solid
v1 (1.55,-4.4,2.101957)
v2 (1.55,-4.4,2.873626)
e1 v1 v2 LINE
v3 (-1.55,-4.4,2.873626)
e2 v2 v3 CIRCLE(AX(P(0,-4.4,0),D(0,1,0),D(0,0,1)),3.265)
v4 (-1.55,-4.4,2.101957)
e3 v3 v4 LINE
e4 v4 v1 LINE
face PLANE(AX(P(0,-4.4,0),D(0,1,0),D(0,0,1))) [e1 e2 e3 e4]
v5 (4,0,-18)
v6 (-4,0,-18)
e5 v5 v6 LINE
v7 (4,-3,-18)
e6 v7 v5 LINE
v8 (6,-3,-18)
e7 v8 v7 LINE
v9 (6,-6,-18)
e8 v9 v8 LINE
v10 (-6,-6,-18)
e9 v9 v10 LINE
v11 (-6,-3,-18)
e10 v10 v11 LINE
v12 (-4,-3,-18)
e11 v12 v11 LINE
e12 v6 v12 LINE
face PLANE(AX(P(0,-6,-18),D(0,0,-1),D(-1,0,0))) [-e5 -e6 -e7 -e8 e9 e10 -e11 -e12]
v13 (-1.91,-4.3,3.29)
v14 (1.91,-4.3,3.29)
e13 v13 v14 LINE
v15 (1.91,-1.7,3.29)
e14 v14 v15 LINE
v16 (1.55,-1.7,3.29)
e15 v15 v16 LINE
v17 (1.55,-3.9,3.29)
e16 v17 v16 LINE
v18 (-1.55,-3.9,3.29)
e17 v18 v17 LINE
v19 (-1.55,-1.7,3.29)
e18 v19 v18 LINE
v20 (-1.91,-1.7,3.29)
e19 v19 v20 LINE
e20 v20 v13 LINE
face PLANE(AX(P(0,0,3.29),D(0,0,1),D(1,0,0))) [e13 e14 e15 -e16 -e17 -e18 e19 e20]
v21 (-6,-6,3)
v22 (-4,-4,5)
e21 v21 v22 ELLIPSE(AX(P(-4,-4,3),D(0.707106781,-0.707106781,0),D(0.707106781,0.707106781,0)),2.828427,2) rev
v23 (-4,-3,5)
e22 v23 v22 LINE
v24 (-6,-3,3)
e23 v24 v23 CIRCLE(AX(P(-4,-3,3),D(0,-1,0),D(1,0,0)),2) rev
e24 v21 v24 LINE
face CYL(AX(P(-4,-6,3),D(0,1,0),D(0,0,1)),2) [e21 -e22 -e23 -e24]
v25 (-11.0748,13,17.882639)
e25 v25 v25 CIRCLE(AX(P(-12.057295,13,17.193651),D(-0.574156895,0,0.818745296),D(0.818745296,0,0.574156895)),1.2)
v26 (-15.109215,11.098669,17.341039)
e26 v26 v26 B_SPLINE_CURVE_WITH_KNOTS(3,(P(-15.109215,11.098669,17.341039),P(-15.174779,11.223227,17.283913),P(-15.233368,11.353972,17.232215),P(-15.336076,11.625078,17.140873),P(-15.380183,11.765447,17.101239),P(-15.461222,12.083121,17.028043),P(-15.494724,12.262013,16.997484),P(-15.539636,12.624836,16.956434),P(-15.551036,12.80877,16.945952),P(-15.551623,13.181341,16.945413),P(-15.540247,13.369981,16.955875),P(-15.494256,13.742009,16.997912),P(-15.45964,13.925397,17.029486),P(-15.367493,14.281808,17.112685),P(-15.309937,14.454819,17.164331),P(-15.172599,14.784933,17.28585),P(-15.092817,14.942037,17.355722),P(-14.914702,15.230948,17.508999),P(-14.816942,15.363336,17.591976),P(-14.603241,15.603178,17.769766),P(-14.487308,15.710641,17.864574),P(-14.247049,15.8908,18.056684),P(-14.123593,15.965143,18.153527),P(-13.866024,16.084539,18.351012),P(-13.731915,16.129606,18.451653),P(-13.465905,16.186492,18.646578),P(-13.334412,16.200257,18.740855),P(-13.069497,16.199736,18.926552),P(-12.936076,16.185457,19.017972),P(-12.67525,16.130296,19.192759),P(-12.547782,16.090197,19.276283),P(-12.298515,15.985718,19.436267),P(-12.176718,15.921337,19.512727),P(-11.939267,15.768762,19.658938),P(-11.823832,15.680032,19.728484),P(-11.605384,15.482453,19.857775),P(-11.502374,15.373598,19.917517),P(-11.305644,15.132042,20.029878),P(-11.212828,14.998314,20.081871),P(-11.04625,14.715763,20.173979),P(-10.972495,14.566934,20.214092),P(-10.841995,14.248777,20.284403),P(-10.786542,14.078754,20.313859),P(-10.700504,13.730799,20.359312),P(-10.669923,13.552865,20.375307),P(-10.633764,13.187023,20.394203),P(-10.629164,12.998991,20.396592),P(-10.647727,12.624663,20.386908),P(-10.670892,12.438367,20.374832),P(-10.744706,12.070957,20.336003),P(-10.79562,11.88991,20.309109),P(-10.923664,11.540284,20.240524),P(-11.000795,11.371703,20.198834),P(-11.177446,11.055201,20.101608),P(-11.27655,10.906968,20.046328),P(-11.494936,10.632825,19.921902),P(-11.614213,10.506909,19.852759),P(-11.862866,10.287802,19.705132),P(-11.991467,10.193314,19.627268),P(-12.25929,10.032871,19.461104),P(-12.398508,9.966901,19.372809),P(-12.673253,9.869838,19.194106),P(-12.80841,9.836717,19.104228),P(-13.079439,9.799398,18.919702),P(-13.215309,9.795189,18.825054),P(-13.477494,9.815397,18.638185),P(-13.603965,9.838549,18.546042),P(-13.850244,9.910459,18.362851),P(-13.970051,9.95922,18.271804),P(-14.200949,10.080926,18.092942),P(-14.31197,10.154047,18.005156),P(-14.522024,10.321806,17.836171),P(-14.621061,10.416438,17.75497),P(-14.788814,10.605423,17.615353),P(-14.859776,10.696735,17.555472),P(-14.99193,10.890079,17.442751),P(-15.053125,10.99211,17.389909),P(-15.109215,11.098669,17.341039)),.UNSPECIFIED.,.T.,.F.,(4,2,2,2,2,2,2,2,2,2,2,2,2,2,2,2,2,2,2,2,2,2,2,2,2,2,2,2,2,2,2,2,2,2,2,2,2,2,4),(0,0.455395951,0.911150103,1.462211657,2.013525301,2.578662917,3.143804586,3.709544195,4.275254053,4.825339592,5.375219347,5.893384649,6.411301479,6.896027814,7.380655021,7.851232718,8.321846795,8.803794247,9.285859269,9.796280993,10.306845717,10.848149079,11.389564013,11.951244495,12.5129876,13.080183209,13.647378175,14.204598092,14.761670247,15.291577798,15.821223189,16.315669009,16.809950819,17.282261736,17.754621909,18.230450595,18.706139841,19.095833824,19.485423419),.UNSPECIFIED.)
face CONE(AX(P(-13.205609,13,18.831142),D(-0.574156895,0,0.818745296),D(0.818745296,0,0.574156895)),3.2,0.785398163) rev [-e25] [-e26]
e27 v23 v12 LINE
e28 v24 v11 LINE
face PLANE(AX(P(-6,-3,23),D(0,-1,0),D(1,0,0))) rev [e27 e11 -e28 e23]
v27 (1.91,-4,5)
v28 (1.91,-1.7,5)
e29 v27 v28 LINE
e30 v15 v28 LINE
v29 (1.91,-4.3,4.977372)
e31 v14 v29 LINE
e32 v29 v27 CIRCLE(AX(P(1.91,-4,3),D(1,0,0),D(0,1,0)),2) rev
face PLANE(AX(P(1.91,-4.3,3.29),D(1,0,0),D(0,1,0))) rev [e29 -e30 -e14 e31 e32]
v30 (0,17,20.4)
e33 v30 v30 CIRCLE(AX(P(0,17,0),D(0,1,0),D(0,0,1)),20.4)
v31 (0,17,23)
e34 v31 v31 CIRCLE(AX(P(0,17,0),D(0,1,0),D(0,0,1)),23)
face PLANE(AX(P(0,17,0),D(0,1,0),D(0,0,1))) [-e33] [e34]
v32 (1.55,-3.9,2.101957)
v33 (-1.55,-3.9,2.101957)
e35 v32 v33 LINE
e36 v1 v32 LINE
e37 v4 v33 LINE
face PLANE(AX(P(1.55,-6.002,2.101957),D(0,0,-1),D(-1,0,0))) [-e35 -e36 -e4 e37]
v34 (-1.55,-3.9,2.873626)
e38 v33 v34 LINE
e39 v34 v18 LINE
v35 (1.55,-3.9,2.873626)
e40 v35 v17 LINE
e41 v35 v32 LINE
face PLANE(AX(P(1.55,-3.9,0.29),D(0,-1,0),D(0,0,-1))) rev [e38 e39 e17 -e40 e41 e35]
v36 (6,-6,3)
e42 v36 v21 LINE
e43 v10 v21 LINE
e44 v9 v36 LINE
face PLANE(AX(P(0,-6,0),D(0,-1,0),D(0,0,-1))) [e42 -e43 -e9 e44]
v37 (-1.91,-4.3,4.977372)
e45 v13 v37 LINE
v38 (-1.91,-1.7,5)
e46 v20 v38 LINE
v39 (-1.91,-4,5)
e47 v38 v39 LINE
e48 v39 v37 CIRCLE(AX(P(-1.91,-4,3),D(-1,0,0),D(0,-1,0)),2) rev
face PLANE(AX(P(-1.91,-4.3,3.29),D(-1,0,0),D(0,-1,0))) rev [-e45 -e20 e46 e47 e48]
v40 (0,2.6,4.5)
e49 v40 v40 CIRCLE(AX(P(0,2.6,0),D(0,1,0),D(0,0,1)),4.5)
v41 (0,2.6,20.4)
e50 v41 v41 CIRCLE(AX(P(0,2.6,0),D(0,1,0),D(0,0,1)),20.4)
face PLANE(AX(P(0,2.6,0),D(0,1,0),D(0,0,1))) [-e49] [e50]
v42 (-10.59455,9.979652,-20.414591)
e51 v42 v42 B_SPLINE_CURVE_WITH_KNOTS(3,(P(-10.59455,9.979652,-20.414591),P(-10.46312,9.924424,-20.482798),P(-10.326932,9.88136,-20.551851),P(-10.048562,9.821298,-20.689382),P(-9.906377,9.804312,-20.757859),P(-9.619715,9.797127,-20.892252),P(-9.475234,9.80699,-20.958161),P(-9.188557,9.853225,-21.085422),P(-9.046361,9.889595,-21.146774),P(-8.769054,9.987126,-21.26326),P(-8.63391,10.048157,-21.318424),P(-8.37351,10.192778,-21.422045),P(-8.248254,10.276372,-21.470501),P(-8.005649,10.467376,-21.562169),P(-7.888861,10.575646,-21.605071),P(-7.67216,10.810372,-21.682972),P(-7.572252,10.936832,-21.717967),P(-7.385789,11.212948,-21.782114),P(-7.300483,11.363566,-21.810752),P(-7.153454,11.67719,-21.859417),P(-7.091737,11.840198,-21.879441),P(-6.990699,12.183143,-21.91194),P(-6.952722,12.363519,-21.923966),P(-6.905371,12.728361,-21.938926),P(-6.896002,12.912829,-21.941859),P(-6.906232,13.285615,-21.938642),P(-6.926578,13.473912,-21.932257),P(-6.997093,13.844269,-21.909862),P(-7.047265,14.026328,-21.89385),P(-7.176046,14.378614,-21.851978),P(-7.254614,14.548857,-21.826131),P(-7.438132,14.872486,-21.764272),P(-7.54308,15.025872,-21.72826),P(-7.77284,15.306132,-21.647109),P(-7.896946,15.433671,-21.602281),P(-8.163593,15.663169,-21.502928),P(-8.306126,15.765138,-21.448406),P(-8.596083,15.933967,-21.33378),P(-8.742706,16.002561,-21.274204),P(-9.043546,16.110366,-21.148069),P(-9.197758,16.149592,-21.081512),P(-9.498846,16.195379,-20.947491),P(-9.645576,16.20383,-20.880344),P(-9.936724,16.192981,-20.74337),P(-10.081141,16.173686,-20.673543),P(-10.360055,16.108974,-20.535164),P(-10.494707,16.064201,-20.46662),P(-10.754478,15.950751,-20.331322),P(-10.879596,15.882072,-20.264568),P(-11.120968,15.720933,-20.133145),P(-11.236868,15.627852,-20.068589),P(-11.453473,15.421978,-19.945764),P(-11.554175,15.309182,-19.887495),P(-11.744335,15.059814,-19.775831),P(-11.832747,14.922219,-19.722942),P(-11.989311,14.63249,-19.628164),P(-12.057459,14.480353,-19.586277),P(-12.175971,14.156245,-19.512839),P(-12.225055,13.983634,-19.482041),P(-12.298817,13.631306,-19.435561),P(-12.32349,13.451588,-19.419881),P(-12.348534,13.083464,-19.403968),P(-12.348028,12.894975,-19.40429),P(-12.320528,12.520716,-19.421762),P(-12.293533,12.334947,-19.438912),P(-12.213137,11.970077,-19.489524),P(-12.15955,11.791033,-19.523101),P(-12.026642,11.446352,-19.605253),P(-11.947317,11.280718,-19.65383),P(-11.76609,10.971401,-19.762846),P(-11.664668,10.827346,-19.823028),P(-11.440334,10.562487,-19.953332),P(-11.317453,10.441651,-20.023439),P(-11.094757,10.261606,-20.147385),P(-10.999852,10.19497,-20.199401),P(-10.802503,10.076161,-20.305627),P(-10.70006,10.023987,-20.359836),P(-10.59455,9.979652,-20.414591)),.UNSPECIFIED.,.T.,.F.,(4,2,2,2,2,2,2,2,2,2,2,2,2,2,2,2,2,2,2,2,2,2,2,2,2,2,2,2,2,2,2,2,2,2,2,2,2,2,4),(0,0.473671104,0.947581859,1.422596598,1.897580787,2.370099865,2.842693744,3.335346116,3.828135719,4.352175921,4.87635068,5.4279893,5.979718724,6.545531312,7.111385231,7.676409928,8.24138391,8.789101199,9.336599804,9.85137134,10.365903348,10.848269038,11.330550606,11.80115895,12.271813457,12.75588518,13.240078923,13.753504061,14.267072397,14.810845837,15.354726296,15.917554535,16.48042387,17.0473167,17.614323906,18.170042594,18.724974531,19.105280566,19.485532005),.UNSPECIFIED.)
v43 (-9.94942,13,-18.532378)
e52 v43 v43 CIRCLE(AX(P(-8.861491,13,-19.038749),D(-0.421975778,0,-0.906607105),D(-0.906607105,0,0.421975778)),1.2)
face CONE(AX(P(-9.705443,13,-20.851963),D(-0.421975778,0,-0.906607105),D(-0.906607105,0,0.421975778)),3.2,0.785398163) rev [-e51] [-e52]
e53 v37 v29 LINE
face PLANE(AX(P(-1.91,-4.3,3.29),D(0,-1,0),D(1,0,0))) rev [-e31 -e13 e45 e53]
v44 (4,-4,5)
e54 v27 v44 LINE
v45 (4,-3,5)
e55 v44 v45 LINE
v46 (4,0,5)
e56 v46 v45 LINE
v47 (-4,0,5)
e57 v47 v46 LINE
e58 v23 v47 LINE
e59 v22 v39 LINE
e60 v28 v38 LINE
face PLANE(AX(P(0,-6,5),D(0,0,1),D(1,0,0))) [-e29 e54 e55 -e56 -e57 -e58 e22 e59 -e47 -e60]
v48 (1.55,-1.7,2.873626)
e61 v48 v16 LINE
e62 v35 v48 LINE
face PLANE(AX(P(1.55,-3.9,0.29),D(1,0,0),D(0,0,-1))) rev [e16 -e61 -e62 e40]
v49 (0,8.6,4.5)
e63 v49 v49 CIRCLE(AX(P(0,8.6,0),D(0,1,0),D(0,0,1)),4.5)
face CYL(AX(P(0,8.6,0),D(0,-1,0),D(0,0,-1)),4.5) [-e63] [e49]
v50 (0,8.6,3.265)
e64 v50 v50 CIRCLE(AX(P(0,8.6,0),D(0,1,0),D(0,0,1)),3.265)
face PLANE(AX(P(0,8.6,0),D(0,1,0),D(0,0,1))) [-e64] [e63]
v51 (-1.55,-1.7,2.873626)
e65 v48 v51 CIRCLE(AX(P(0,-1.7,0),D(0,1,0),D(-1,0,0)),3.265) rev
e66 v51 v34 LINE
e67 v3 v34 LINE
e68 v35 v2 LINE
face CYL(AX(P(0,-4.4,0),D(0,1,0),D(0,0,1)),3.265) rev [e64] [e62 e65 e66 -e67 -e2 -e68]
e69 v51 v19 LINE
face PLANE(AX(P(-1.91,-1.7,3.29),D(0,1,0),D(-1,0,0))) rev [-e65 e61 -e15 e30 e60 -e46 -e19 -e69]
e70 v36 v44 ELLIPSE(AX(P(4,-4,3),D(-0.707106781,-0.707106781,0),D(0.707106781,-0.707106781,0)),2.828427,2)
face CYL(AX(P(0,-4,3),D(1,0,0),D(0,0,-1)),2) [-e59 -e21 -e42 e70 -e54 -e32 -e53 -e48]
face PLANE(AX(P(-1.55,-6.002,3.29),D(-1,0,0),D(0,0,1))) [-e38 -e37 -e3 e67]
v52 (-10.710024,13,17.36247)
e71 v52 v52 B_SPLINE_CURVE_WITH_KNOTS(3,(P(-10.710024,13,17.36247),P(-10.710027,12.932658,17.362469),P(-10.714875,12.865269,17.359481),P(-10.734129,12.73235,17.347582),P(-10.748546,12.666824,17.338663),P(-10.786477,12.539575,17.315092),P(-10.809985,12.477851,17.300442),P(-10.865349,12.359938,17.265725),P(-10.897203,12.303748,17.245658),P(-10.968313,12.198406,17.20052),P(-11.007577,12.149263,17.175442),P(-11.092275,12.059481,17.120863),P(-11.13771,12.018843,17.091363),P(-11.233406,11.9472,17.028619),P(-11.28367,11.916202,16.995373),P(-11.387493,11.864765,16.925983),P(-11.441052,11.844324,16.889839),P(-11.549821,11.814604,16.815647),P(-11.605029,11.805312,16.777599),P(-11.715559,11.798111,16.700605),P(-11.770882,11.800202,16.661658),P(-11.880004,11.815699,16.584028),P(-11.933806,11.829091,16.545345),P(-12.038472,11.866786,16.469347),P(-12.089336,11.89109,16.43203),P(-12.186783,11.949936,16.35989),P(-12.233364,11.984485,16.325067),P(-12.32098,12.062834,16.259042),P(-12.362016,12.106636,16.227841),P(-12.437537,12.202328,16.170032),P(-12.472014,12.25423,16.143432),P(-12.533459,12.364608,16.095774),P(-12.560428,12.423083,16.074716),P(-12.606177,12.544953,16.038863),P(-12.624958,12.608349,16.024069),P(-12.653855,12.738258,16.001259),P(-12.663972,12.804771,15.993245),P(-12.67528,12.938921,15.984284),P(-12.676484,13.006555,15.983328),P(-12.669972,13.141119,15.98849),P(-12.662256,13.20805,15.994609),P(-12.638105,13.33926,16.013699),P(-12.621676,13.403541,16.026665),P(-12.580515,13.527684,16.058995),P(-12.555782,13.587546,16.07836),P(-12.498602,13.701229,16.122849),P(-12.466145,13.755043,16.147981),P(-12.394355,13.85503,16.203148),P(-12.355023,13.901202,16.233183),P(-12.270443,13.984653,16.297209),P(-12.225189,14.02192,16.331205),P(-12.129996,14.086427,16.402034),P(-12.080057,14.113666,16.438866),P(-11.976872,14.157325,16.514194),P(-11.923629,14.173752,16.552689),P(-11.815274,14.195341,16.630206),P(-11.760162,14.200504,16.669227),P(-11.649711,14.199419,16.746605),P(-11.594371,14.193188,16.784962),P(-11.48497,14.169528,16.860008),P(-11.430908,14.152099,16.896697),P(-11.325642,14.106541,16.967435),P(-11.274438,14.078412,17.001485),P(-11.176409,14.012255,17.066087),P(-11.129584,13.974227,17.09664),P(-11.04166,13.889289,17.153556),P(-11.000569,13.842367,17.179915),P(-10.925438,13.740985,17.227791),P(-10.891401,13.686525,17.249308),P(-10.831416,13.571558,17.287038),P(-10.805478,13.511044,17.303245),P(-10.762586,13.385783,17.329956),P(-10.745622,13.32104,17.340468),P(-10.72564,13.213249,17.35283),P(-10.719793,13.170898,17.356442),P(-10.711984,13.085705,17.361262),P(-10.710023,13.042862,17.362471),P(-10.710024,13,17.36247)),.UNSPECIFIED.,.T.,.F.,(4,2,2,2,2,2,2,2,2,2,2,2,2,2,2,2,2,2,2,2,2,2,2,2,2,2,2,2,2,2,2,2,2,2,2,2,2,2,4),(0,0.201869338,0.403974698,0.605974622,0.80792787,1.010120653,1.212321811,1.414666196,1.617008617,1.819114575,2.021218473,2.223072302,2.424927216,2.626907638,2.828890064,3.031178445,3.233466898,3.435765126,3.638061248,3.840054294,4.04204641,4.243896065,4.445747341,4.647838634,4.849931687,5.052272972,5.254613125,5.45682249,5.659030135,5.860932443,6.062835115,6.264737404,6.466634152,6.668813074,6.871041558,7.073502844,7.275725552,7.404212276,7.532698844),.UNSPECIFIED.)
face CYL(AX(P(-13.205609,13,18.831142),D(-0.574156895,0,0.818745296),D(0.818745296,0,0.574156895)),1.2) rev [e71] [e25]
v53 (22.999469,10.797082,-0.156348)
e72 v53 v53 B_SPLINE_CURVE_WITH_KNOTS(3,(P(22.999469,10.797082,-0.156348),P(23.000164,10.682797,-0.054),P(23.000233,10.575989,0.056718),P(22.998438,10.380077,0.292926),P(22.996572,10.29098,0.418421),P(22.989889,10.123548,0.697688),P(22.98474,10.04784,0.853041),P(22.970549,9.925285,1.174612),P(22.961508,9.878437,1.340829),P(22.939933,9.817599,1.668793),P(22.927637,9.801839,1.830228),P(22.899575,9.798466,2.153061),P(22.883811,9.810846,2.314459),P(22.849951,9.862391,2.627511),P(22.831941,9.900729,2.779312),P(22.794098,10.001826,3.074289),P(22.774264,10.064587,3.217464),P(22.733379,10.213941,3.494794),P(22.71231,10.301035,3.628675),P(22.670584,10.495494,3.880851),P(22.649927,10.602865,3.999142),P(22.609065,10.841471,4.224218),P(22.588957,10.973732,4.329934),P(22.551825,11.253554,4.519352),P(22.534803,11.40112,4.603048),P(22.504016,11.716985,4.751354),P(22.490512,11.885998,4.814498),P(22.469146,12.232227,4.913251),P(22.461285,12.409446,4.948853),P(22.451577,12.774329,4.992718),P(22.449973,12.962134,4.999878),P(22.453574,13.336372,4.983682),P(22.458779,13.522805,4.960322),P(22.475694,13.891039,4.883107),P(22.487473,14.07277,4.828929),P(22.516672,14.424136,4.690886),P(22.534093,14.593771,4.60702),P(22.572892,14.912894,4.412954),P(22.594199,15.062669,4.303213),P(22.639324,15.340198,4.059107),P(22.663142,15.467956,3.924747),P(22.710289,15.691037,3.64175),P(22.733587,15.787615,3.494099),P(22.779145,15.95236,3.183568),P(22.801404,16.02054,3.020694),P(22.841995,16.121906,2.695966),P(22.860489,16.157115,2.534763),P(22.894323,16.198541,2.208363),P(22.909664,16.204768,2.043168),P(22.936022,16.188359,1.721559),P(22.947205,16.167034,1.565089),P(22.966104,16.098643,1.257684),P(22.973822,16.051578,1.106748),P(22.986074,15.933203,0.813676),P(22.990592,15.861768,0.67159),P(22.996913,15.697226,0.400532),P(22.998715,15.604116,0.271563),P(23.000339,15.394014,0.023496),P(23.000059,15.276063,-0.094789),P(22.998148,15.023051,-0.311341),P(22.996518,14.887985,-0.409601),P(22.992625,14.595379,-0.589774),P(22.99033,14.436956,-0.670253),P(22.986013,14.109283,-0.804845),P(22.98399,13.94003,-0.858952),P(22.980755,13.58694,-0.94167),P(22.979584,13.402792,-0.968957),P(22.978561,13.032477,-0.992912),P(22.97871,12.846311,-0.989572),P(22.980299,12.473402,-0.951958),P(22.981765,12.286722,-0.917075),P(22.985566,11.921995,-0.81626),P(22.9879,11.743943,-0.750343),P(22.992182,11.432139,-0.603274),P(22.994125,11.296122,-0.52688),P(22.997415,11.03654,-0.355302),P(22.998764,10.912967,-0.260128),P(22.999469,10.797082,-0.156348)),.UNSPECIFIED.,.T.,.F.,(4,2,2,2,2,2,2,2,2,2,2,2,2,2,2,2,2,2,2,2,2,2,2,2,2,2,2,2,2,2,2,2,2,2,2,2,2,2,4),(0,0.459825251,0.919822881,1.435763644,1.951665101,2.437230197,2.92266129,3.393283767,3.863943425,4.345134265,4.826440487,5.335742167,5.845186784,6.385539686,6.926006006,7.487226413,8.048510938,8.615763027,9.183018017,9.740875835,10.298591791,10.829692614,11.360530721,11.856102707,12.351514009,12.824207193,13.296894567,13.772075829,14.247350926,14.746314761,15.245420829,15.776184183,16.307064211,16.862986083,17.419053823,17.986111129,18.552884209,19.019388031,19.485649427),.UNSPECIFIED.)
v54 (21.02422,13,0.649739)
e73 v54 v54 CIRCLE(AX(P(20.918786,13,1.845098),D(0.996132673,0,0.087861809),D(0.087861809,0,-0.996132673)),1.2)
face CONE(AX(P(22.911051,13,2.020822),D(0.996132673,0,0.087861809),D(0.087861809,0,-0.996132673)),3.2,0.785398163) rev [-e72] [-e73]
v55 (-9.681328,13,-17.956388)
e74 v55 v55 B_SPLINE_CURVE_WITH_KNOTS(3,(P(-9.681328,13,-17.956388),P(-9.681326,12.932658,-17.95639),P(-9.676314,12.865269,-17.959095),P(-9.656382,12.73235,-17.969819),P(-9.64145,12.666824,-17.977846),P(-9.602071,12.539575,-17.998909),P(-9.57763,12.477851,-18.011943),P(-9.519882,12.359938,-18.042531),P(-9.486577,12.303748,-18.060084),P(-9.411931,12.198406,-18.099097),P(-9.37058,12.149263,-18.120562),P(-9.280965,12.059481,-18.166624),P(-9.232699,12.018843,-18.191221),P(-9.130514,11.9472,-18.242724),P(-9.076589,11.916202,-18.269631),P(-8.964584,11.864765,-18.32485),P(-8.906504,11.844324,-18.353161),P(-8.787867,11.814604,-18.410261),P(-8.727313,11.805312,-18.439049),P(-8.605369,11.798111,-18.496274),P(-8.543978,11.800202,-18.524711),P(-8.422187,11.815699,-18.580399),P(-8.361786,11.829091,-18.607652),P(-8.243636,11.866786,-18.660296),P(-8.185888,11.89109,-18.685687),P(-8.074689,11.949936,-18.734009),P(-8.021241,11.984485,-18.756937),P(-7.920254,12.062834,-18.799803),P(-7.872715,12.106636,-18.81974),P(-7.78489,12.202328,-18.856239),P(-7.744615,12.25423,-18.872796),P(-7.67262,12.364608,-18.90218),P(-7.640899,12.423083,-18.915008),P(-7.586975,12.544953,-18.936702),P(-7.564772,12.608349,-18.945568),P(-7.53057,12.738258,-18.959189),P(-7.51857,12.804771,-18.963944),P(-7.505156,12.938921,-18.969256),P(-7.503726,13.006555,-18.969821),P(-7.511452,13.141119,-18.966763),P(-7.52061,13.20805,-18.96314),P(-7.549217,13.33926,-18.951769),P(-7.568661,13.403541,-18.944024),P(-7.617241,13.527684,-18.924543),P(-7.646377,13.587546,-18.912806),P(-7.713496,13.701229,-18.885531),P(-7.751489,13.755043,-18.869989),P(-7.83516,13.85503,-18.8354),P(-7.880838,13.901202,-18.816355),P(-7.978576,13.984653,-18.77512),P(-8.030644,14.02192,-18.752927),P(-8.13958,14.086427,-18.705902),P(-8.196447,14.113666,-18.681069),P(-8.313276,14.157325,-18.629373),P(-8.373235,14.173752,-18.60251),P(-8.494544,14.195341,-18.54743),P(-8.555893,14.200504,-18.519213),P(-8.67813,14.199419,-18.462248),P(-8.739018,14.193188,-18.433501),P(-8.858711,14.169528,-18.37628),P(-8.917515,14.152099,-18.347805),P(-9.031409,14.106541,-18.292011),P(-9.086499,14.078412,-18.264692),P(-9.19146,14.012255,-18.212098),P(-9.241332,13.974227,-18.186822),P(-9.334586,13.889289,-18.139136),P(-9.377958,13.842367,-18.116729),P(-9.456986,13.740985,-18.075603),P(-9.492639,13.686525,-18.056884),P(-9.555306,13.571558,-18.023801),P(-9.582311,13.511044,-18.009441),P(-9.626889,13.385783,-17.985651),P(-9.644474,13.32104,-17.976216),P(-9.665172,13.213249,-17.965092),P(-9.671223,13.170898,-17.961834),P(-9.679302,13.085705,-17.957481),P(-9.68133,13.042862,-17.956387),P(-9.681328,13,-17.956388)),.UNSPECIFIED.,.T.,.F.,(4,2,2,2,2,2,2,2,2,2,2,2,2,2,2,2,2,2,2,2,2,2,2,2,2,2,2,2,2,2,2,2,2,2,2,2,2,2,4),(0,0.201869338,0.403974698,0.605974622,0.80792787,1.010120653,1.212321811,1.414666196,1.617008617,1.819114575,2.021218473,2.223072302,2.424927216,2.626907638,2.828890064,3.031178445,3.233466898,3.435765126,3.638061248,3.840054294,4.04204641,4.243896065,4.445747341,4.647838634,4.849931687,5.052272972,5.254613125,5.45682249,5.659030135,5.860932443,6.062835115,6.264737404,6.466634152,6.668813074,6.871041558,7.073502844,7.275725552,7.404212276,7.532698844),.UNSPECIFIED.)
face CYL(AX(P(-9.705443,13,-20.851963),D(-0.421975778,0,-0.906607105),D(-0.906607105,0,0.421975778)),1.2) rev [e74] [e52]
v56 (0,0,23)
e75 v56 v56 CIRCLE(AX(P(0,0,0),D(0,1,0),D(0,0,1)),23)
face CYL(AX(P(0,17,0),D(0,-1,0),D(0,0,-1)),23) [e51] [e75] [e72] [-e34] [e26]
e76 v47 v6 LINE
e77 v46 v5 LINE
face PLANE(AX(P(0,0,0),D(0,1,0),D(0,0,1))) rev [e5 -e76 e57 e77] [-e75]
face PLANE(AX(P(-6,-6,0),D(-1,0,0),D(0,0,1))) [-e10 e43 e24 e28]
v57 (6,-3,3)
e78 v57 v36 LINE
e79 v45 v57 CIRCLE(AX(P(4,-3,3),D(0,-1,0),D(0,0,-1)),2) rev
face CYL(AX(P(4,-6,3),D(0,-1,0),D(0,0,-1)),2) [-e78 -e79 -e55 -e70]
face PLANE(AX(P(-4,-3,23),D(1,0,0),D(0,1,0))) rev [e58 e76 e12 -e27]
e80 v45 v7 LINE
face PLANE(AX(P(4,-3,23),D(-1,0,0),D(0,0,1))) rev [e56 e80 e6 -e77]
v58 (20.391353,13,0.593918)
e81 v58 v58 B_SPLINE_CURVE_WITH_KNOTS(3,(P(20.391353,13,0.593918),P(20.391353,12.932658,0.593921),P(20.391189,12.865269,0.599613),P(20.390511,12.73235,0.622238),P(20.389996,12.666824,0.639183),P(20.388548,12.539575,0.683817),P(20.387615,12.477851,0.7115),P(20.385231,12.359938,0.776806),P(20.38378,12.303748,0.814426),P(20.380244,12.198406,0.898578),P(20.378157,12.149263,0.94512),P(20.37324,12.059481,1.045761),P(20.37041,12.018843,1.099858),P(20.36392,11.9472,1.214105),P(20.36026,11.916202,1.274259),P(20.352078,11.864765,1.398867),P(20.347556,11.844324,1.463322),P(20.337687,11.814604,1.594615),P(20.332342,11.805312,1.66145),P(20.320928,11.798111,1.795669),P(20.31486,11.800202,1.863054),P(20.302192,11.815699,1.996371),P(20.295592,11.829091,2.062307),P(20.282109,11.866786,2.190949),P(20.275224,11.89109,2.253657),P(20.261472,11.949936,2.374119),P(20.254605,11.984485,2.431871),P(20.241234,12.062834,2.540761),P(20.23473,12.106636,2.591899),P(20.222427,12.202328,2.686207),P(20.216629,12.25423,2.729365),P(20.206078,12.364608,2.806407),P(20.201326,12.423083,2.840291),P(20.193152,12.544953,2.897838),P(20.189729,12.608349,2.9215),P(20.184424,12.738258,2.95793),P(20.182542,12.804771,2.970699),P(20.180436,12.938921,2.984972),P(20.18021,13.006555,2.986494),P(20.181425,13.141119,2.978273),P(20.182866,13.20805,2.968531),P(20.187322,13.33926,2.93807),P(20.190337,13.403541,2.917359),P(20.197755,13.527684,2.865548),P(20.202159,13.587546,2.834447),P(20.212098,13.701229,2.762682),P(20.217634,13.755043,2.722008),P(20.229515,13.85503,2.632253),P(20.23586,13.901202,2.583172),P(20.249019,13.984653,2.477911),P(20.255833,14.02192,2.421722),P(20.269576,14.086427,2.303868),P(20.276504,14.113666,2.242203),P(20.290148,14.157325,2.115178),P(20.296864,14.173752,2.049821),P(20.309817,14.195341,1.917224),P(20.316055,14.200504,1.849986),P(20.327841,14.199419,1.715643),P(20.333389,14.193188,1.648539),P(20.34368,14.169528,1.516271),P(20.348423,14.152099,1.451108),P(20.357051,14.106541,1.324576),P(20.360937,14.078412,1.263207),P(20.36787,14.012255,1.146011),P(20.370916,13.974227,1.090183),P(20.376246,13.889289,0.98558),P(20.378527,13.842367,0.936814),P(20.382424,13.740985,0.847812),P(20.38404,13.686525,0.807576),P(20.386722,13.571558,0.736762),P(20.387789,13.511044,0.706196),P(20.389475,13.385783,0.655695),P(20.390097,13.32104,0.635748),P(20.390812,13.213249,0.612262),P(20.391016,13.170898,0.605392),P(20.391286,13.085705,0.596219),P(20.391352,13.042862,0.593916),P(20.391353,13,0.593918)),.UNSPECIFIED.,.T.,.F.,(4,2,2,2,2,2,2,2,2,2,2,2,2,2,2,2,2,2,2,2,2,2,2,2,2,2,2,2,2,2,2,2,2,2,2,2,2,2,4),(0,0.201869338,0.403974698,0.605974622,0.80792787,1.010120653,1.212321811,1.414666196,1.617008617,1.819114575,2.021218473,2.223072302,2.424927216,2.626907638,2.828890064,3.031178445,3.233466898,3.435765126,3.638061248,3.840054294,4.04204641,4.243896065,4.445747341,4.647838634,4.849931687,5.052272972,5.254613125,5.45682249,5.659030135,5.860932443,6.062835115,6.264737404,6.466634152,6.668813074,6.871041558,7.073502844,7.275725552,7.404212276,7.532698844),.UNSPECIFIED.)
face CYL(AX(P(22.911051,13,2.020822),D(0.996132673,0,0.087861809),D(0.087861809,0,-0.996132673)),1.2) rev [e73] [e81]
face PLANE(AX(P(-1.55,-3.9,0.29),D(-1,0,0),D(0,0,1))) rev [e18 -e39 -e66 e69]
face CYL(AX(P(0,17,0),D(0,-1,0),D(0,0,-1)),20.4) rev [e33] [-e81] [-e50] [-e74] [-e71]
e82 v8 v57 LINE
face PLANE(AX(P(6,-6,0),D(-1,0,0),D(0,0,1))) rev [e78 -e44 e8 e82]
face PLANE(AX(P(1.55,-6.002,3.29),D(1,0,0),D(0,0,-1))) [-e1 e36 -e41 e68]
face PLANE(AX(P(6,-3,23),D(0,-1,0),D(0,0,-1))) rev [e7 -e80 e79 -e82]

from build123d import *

# Parameters (mm, degrees)
SKETCH1_R           = 23
BOSS_EXTRUDE1_DEPTH = 17
SHELL1_T            = -2.6
SKETCH2_W           = 6
SKETCH2_H           = 23
BOSS_EXTRUDE2_DEPTH = 6
SKETCH3_W           = 2
SKETCH3_H           = 3
CUT_EXTRUDE1_DEPTH  = 50.989999
SKETCH4_R           = 4.5
BOSS_EXTRUDE3_DEPTH = 6
SKETCH5_R           = 3.265
CUT_EXTRUDE2_DEPTH  = 13
SKETCH7_W           = 3.82
SKETCH7_H           = 2.6
CUT_EXTRUDE3_DEPTH  = 1.71
CIRPATTERN1_COUNT   = 3
SKETCH10_W          = 3.1
SKETCH10_H          = 2.2
CUT_EXTRUDE4_DEPTH  = 3
BOSS_EXTRUDE6_REACH = 40.663
SKETCH11_W          = 3.1
SKETCH11_H          = 1.188042875
FILLET1_R           = 2


with BuildPart() as part:
    # Sketch1 → Boss-Extrude1 (new body)
    with BuildSketch(Plane(origin=(0, 0, 0), x_dir=(1, 0, 0), z_dir=(0, 1, 0))):
        with Locations(Location((0, 0, 0), (0, 0, 270))):
            Circle(SKETCH1_R)
    extrude(amount=BOSS_EXTRUDE1_DEPTH)

    # Shell1
    shell1_openings = [part.faces().sort_by_distance(p)[0] for p in [
        (0, 17, 0),
    ]]
    offset(amount=SHELL1_T, openings=shell1_openings, kind=Kind.INTERSECTION)

    # Sketch2 → Boss-Extrude2 (add)
    with BuildSketch(Plane.XZ):
        with Locations((-3, -6.5)):
            Rectangle(SKETCH2_W, SKETCH2_H)
        with Locations((3, -6.5)):
            Rectangle(SKETCH2_W, SKETCH2_H)
    extrude(amount=BOSS_EXTRUDE2_DEPTH)

    # Sketch3 → Cut-Extrude1 (cut, through all)
    with BuildSketch(Plane(origin=(0, 0, -18), x_dir=(-1, 0, 0), z_dir=(0, 0, -1))):
        with Locations((-5, -1.5)):
            Rectangle(SKETCH3_W, SKETCH3_H)
        with Locations((5, -1.5)):
            Rectangle(SKETCH3_W, SKETCH3_H)
    extrude(amount=-CUT_EXTRUDE1_DEPTH, mode=Mode.SUBTRACT)

    # Sketch4 → Boss-Extrude3 (add)
    with BuildSketch(Plane(origin=(0, 2.6, 0), x_dir=(1, 0, 0), z_dir=(0, 1, 0))):
        with Locations(Location((0, 0, 0), (0, 0, 270))):
            Circle(SKETCH4_R)
    extrude(amount=BOSS_EXTRUDE3_DEPTH)

    # Sketch5 → Cut-Extrude2 (cut)
    with BuildSketch(Plane(origin=(0, 8.6, 0), x_dir=(1, 0, 0), z_dir=(0, 1, 0))):
        with Locations(Location((0, 0, 0), (0, 0, 270))):
            Circle(SKETCH5_R)
    extrude(amount=-CUT_EXTRUDE2_DEPTH, mode=Mode.SUBTRACT)

    # Sketch7 → Cut-Extrude3 (cut)
    with BuildSketch(Plane.XY.offset(5)):
        with Locations((0, -3)):
            Rectangle(SKETCH7_W, SKETCH7_H)
    extrude(amount=-CUT_EXTRUDE3_DEPTH, mode=Mode.SUBTRACT)

    # Sketch9 → CSK SLOT for M2 Countersunk Flat Head Screw1 (revolve, cut)
    with BuildSketch(Plane(origin=(22.911051483, 13, 2.020821599), x_dir=(0.08786180866791495, 0, -0.9961326731804369), z_dir=(0, 1, 0))):
        Polygon((0, 0), (0, 5.721032743), (1.2, 5), (1.2, 2), (3.2, 0), align=None)
    csk_slot_for_m2_countersunk_flat_head_sc = revolve(axis=Axis((29.236493958, 13, 2.578744084), (-0.9961326731804366, 0, -0.08786180866791493)), mode=Mode.SUBTRACT)

    # CirPattern1: CSK SLOT for M2 Countersunk Flat Head Screw1 ×3 about axis
    cirpattern1_axis = Axis((0, 17, 0), (0, -1, 0))
    for i in range(1, CIRPATTERN1_COUNT):
        add(csk_slot_for_m2_countersunk_flat_head_sc.rotate(cirpattern1_axis, i * 360 / CIRPATTERN1_COUNT), mode=Mode.SUBTRACT)

    # Sketch10 → Cut-Extrude4 (cut)
    with BuildSketch(Plane.XY.offset(3.29)):
        with Locations((0, -2.8)):
            Rectangle(SKETCH10_W, SKETCH10_H)
    extrude(amount=-CUT_EXTRUDE4_DEPTH, mode=Mode.SUBTRACT)

    # Sketch11 → Boss-Extrude6 (add, up to next)
    with BuildSketch(Plane(origin=(0, -3.9, 0), x_dir=(1, 0, 0), z_dir=(0, 1, 0)), mode=Mode.PRIVATE) as boss_extrude6_sk1:
        with Locations((0, -2.695978563)):
            Rectangle(SKETCH11_W, SKETCH11_H)
    boss_extrude6_tool1 = extrude(boss_extrude6_sk1.sketch, amount=-BOSS_EXTRUDE6_REACH, mode=Mode.PRIVATE) - part.part
    add(boss_extrude6_tool1.solids().sort_by_distance((0, -3.9, 2.695979))[0])

    # Fillet1
    # the kernel refuses this fillet: 2 mm, written as the material it takes off along each edge
    with BuildSketch(Plane(origin=(-6, 2, 5), x_dir=(1, 0, 0), z_dir=(0, -1, 0))) as fillet1_piece_1_section:
        with BuildLine():
            CenterArc((FILLET1_R, -FILLET1_R), FILLET1_R, 90, 90)
            Line((0, -FILLET1_R), (0, 0))
            Line((0, 0), (FILLET1_R, 0))
        make_face()
    fillet1_piece_1 = extrude(amount=13, mode=Mode.PRIVATE)
    fillet1_piece_1 = split(fillet1_piece_1, bisect_by=Plane(origin=(-5.547209771, 0, 4.547209771), z_dir=(0, -1, 0)), keep=Keep.TOP, mode=Mode.PRIVATE)
    add(fillet1_piece_1, mode=Mode.SUBTRACT)
    with BuildSketch(Plane(origin=(-11, -6, 5), x_dir=(0, 1, 0), z_dir=(1, 0, 0))) as fillet1_piece_2:
        with BuildLine():
            CenterArc((FILLET1_R, -FILLET1_R), FILLET1_R, 90, 90)
            Line((0, -FILLET1_R), (0, 0))
            Line((0, 0), (FILLET1_R, 0))
        make_face()
    extrude(amount=22, mode=Mode.SUBTRACT)
    with BuildSketch(Plane(origin=(6, 2, 5), x_dir=(-1, 0, 0), z_dir=(0, -1, 0))) as fillet1_piece_3_section:
        with BuildLine():
            CenterArc((FILLET1_R, FILLET1_R), FILLET1_R, 180, 90)
            Line((0, FILLET1_R), (0, 0))
            Line((0, 0), (FILLET1_R, 0))
        make_face()
    fillet1_piece_3 = extrude(amount=13, mode=Mode.PRIVATE)
    fillet1_piece_3 = split(fillet1_piece_3, bisect_by=Plane(origin=(5.547209771, 0, 4.547209771), z_dir=(0, -1, 0)), keep=Keep.TOP, mode=Mode.PRIVATE)
    add(fillet1_piece_3, mode=Mode.SUBTRACT)


solid = part.part
